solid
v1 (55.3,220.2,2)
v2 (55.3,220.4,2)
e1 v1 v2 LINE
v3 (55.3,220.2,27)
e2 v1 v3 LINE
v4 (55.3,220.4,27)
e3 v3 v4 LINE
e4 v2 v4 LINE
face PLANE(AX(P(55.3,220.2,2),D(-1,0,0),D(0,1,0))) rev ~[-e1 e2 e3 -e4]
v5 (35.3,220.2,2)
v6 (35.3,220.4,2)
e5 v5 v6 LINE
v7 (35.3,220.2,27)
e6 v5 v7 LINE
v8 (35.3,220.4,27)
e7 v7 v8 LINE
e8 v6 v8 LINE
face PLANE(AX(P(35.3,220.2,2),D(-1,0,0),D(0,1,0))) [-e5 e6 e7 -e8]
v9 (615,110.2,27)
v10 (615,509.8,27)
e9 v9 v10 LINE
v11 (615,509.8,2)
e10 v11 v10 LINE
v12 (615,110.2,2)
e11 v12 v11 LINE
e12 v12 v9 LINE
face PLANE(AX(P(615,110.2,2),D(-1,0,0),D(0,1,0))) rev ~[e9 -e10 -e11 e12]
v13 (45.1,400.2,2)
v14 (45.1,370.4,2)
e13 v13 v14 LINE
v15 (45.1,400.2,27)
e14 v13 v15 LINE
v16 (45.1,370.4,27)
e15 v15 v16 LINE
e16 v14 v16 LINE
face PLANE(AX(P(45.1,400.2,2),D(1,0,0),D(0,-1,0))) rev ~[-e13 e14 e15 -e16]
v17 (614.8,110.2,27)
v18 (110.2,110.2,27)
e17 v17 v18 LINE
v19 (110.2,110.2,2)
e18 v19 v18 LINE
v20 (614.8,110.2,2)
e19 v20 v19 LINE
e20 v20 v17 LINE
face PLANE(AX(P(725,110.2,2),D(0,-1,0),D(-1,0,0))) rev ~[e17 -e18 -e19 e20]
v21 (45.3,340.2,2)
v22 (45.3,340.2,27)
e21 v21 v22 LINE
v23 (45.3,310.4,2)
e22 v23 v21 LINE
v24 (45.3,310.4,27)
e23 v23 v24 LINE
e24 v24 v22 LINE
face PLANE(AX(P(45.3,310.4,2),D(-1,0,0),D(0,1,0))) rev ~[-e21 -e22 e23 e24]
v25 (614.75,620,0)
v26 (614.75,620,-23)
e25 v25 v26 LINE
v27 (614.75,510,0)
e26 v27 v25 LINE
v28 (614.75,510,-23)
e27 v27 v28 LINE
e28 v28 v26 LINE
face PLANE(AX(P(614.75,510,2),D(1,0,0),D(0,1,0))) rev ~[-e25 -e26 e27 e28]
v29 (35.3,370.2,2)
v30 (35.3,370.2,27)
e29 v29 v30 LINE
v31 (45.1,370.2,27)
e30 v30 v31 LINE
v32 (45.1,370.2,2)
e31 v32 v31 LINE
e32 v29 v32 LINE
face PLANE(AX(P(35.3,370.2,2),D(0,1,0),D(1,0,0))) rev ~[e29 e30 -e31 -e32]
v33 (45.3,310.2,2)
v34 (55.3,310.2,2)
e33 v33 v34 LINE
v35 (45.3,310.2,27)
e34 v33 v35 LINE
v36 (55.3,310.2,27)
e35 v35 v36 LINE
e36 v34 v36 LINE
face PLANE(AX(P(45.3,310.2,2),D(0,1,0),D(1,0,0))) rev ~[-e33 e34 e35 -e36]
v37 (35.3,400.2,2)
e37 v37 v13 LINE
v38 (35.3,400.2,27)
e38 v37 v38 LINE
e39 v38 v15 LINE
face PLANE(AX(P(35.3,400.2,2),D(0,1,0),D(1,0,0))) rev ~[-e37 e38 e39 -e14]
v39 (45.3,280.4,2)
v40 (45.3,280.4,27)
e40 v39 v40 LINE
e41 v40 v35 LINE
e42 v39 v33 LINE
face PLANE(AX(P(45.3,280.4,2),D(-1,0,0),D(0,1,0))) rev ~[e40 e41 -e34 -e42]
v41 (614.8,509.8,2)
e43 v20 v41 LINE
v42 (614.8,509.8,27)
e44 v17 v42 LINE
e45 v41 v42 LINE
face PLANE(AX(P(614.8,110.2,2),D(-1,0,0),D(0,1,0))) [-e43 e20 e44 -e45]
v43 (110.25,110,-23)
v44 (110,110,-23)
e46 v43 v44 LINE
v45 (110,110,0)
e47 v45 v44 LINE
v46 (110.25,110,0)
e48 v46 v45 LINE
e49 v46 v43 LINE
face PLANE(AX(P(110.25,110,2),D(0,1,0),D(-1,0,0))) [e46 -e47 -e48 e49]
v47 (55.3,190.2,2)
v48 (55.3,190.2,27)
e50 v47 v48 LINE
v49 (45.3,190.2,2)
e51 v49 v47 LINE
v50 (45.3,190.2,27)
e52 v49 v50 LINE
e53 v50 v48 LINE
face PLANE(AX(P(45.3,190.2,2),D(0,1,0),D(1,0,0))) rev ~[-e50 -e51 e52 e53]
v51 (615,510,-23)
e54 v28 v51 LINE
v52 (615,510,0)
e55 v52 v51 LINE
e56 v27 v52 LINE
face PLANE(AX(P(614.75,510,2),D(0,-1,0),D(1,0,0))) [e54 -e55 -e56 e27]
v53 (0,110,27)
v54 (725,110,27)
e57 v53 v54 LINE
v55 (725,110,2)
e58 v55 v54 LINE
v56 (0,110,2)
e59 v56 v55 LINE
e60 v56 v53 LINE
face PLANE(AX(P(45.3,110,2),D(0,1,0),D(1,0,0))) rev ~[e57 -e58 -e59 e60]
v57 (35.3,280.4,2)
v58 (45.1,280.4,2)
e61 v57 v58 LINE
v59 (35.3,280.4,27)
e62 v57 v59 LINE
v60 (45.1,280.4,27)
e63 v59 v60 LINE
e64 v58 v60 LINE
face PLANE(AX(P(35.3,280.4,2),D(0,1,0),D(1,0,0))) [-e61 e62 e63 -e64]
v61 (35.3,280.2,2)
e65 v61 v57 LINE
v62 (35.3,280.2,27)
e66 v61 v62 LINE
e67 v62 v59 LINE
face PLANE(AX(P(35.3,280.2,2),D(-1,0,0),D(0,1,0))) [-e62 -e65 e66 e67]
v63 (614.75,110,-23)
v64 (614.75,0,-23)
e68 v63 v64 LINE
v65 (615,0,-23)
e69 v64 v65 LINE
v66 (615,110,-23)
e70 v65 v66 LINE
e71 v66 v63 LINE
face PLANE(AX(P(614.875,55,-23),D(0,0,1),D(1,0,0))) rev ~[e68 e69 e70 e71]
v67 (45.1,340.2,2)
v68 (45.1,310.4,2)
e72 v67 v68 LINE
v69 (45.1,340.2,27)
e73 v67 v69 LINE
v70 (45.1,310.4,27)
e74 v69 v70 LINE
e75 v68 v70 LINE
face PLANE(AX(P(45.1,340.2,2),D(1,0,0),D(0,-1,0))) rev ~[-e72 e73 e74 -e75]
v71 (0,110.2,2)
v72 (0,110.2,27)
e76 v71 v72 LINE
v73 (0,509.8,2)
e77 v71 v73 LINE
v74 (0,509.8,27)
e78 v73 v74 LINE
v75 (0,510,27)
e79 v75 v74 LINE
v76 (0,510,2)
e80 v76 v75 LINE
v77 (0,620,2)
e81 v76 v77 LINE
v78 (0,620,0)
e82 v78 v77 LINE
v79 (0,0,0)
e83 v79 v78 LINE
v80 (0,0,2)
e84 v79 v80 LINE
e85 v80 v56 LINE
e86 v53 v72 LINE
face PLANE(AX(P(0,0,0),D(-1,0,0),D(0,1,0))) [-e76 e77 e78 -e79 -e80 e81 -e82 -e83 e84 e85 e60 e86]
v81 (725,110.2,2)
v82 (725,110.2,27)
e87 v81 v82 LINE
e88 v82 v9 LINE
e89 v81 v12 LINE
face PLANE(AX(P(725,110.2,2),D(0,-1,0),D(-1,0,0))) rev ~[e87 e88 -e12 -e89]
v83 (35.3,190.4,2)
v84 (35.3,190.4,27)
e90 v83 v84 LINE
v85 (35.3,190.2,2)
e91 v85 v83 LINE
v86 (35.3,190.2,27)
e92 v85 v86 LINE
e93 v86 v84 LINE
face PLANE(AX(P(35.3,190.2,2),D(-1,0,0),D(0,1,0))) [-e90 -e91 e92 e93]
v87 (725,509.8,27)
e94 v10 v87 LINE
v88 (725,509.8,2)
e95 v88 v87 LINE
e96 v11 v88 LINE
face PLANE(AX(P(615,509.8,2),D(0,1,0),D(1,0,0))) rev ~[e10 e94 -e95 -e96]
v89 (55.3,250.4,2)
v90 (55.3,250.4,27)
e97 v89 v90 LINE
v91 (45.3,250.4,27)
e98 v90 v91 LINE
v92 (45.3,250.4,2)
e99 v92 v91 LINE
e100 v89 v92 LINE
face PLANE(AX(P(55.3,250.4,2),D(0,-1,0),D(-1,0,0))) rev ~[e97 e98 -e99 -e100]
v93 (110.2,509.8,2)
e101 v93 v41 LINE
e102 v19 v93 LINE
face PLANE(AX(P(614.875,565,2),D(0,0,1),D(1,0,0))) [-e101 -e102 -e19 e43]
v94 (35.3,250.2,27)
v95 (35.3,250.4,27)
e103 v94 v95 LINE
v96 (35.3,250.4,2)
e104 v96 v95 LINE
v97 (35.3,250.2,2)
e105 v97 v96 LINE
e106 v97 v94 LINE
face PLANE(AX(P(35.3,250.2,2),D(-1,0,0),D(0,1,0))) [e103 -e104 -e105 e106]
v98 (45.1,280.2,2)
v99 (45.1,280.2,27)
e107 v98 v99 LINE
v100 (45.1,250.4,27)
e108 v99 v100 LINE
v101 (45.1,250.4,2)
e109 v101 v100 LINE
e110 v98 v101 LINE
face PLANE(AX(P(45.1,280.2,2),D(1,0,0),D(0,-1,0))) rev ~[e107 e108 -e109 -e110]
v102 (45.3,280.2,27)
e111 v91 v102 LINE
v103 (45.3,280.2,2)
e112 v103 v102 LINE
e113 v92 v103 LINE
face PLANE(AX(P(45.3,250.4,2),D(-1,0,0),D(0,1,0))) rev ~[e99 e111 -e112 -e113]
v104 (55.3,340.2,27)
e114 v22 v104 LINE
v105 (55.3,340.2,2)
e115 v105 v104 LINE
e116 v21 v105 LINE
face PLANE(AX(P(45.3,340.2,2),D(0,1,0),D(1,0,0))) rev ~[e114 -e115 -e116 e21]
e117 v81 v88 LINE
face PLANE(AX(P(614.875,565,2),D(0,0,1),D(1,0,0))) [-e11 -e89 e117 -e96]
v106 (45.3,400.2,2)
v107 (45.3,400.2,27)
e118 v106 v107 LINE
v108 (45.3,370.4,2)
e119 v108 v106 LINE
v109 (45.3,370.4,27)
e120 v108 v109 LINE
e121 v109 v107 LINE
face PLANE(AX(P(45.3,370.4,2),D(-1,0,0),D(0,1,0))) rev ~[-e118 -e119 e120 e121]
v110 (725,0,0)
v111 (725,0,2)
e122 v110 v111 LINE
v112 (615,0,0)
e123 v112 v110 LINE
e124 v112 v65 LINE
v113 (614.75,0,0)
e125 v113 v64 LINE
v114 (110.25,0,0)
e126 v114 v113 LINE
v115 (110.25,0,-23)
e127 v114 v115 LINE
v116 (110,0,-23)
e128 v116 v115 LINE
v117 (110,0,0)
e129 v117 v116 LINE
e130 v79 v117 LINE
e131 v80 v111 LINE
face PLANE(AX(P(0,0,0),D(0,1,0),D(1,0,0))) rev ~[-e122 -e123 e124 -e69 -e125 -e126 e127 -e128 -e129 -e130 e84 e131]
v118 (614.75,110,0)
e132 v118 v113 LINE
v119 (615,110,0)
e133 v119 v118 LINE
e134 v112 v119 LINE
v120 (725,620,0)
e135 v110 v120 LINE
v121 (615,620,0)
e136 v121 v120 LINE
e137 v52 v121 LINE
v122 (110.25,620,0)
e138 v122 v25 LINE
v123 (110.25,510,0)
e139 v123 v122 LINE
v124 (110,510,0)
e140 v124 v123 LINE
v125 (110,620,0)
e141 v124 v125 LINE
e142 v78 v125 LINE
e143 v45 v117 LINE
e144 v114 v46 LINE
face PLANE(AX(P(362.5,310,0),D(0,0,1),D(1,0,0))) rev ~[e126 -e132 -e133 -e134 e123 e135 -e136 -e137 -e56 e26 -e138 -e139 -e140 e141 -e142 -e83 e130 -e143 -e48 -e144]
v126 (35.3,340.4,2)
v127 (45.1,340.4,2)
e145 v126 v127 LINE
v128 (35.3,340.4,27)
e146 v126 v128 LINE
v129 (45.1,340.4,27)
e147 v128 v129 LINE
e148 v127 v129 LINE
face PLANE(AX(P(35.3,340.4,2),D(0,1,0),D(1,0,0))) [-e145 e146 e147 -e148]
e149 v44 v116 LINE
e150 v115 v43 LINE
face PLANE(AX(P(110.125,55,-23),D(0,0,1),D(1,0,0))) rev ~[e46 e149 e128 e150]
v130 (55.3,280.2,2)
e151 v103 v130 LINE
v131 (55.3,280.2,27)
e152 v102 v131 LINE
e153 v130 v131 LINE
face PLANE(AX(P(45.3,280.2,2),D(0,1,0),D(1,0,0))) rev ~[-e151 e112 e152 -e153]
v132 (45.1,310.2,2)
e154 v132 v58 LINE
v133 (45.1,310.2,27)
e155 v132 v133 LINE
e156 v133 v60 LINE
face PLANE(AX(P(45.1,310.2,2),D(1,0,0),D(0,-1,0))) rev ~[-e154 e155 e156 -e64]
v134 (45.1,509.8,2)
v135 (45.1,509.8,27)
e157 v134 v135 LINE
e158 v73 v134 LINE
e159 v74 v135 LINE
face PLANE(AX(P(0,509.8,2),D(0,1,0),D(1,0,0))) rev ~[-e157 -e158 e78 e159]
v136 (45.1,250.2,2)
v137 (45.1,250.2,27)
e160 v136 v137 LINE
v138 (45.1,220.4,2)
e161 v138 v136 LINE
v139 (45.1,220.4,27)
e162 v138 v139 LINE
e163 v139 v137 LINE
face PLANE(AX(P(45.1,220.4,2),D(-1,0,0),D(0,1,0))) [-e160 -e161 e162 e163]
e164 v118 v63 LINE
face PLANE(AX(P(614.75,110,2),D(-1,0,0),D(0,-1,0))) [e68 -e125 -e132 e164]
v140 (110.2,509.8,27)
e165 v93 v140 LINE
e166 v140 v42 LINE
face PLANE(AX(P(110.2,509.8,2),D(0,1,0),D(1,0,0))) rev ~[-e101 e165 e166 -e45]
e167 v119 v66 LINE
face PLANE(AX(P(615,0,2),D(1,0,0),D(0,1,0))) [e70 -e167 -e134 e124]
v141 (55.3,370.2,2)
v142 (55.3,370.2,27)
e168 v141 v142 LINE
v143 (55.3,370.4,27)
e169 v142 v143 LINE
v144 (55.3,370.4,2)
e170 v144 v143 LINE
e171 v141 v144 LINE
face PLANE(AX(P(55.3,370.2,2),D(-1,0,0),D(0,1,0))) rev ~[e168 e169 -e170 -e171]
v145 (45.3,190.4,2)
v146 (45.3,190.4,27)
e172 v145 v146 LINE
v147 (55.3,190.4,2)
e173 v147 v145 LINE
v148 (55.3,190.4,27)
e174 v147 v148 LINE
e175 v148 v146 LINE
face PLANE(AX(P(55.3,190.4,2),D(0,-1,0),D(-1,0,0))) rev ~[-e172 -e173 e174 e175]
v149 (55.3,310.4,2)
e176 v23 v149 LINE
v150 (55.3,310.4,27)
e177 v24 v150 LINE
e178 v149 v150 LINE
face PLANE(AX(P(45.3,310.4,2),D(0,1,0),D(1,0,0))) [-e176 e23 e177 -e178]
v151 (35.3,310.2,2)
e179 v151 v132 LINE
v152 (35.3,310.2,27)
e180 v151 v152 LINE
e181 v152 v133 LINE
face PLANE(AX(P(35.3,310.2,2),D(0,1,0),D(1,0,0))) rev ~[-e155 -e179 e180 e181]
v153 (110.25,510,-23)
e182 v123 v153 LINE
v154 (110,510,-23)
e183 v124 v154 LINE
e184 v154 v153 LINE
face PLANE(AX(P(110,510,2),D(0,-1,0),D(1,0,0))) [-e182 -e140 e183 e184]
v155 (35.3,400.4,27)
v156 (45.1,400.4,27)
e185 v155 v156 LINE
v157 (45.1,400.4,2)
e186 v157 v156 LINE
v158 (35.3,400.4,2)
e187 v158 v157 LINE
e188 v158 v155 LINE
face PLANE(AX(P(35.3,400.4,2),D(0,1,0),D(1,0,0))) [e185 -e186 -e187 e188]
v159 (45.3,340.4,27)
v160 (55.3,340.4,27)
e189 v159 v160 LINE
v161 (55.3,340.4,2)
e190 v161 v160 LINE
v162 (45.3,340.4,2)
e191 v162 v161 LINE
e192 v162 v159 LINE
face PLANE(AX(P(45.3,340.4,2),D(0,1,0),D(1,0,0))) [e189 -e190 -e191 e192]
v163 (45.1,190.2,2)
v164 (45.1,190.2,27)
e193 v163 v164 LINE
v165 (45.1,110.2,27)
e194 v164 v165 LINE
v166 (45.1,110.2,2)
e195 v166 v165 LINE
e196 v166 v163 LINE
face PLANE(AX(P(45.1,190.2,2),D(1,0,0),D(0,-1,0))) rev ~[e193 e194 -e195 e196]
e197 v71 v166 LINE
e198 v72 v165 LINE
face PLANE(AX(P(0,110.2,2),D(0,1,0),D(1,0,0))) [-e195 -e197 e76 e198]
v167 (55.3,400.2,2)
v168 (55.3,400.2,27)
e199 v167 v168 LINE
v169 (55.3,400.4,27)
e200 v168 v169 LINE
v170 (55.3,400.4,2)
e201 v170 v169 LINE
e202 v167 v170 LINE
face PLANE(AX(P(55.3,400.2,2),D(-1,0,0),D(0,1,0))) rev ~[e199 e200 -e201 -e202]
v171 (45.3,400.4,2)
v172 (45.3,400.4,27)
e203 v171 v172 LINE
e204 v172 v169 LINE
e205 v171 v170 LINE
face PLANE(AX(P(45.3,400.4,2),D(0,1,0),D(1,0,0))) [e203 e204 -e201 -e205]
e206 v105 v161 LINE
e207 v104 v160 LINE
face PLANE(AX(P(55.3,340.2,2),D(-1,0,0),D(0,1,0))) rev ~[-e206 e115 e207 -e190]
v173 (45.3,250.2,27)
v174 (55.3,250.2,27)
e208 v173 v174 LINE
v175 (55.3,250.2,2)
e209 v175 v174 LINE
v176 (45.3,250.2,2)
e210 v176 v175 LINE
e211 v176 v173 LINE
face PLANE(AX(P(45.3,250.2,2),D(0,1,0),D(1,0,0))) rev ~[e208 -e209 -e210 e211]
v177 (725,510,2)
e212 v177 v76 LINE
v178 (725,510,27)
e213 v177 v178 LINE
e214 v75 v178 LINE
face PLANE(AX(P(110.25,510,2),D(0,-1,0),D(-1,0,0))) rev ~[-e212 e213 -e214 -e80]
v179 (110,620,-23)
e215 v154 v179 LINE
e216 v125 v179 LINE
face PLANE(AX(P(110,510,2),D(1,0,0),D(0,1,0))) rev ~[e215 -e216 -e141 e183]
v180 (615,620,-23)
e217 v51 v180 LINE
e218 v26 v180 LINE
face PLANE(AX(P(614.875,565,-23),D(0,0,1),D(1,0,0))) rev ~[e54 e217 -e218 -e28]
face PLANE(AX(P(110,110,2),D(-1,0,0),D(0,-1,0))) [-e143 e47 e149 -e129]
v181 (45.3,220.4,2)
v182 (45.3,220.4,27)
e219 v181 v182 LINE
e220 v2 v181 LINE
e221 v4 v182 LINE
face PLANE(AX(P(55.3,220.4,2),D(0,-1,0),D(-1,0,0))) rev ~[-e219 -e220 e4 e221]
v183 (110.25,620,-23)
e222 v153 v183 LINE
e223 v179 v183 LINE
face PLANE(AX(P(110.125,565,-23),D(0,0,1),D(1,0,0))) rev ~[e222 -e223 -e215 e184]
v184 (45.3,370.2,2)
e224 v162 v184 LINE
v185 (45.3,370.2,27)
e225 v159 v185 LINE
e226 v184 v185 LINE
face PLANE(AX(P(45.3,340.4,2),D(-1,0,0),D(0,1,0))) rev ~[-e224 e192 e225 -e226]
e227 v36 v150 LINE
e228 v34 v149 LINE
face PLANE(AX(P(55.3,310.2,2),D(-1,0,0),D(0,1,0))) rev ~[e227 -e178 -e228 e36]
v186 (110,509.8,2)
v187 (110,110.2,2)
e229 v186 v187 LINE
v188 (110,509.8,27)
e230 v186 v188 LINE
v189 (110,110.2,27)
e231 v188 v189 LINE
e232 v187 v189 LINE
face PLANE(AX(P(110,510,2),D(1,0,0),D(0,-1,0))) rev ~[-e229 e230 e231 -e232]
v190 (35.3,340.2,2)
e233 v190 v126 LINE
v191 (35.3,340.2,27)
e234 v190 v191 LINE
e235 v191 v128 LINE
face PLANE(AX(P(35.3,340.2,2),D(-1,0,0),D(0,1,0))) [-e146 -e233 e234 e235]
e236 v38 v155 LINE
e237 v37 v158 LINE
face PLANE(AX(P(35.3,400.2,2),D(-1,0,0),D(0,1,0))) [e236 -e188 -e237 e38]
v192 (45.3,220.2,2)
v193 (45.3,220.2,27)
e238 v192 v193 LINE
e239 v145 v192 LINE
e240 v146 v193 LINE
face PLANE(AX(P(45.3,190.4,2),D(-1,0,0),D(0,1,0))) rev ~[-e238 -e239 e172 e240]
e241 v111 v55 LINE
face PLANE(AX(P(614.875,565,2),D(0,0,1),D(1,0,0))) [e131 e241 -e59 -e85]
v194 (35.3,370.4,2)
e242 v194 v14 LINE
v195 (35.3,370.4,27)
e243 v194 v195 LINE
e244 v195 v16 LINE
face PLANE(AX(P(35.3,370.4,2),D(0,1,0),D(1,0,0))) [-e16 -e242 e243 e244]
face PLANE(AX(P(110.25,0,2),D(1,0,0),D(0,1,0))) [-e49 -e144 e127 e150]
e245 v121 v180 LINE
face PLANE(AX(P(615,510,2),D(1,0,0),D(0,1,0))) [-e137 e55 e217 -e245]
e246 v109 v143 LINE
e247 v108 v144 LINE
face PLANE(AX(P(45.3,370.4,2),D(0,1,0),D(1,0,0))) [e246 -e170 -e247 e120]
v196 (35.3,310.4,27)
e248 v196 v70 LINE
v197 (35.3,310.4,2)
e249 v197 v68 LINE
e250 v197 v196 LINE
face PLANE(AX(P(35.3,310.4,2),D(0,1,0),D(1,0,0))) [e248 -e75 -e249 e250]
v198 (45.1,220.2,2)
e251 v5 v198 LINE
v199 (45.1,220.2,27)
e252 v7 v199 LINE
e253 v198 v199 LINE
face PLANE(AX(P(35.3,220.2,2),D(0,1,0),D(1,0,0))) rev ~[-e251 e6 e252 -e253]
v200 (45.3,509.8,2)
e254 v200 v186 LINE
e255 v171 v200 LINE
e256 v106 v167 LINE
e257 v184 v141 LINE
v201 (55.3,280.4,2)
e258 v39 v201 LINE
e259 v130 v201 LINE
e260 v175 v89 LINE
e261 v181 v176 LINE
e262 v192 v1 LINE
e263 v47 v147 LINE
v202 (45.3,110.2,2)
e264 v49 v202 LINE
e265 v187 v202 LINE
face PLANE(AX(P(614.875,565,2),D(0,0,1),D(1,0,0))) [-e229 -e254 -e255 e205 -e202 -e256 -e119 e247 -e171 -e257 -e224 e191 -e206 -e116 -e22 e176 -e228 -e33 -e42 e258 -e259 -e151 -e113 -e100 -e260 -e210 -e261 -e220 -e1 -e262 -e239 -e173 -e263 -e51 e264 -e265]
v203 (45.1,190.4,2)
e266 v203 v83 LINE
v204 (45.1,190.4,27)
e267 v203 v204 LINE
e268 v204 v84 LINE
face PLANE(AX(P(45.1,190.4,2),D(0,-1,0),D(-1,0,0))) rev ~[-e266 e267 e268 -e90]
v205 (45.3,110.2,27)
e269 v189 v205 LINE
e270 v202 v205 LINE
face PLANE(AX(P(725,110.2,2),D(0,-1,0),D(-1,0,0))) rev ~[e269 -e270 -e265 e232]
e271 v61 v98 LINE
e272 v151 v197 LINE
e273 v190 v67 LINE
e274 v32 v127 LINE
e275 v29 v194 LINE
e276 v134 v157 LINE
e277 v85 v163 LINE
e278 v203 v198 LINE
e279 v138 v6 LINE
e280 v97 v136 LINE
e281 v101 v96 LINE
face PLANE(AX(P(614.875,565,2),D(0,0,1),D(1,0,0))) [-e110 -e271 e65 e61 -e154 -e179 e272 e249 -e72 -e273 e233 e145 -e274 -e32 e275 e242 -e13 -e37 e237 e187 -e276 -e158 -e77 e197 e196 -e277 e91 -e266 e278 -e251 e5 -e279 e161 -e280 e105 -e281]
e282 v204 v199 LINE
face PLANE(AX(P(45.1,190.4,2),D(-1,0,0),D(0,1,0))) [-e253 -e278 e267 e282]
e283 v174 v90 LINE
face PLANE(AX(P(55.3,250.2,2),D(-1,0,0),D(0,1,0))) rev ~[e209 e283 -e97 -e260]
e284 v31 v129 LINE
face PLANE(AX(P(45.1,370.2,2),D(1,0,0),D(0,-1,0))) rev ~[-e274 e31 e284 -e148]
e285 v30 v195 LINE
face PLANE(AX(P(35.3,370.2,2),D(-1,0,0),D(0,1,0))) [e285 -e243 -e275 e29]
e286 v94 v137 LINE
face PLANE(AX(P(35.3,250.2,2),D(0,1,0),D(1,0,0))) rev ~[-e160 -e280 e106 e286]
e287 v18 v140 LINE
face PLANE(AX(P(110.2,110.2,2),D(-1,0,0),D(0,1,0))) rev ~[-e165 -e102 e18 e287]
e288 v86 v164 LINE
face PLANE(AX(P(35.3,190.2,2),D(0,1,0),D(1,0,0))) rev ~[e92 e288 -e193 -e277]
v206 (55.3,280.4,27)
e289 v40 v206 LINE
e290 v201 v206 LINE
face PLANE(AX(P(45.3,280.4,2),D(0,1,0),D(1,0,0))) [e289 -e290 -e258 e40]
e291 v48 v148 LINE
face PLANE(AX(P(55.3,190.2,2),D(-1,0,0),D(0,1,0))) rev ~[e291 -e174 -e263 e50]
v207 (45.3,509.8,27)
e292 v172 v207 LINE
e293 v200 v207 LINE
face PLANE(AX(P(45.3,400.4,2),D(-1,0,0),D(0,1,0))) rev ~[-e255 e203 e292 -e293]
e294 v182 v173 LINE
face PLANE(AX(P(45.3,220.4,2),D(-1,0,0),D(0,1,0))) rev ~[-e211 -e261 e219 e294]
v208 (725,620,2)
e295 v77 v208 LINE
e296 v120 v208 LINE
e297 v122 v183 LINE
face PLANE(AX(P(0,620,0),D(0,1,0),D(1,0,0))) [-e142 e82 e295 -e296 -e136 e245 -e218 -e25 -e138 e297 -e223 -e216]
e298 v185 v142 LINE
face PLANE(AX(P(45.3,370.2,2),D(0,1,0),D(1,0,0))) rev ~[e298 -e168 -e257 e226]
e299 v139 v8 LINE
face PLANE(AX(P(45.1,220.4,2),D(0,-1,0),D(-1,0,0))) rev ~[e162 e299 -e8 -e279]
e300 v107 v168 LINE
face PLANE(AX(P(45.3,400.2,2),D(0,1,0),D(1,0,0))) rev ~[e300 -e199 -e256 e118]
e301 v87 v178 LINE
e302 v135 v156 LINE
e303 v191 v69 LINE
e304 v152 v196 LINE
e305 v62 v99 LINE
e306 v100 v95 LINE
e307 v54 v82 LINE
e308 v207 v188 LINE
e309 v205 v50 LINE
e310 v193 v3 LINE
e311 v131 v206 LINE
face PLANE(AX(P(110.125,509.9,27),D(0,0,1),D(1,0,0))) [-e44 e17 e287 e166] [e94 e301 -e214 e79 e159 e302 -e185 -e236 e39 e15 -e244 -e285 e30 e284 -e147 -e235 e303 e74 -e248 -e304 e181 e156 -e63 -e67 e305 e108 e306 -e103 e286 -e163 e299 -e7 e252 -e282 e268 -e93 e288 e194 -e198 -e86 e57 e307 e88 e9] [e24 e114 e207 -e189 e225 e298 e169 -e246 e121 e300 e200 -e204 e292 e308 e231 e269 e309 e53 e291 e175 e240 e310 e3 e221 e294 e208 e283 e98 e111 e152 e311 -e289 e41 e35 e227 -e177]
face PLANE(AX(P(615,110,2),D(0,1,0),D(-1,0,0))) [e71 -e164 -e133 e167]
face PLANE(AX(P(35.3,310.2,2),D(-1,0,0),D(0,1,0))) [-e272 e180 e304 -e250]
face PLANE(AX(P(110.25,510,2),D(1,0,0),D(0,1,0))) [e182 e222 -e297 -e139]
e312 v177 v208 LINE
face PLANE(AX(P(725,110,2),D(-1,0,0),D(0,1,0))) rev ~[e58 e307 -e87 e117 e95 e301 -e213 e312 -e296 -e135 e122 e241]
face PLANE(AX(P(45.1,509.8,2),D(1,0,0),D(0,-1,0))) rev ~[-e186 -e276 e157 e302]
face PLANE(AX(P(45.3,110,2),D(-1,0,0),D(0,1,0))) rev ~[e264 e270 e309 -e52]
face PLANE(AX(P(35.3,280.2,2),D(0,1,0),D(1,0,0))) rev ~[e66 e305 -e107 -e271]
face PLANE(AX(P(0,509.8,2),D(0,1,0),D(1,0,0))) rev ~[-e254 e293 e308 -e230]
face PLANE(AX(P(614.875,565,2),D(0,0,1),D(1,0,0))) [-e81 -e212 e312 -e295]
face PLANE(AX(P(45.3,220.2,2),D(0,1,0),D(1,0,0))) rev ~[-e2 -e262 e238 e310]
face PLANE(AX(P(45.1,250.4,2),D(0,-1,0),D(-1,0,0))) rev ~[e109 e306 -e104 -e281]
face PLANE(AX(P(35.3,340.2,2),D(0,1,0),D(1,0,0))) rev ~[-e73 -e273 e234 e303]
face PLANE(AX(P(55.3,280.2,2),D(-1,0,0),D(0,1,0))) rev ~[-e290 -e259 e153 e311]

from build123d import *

# Parameters (mm, degrees)
F0_W     = 725
F0_H     = 620
F1_DEPTH = 2
F2_W     = 0.25
F2_H     = 110
F3_DEPTH = 25
F4_DEPTH = 25
F2_W_2   = 110
F2_H_2   = 0.2
F2_W_3   = 0.2
F2_H_3   = 399.6
F5_DEPTH = 25
F2_W_4   = 64.7
F6_DEPTH = 25
F2_W_5   = 45.1
F7_DEPTH = 25
F2_H_4   = 49.5626640439
F8_DEPTH = 25
F2_H_5   = 109.4
F2_W_6   = 9.8
F2_H_6   = 30.4373359561
F2_W_7   = 10
F2_H_7   = 29.8
F9_DEPTH = 25


# Not quite as in the source:
# - a feature names something its author has since deleted; it is built from what else it names


with BuildPart() as f1:
    # F0 (on Top) → F1 (new body)
    with BuildSketch(Plane.XY):
        with Locations((362.5, 310)):
            Rectangle(F0_W, F0_H)
    extrude(amount=F1_DEPTH)

    # F2 (on face) → F3 (join)
    with BuildSketch(Plane.XY.offset(2)):
        with Locations((614.875, 565)):
            Rectangle(F2_W, F2_H)
        with Locations((110.125, 565)):
            Rectangle(F2_W, F2_H)
        Polygon((110.2, 110), (110, 110), (110, 0), (110.25, 0), (110.25, 110), align=None)
        Polygon((615, 110), (614.8, 110), (614.75, 110), (614.75, 0), (615, 0), align=None)
    extrude(amount=-F3_DEPTH)

    # F2 (on face) → F4 (join)
    with BuildSketch(Plane.XY.offset(2)):
        Polygon((110, 510), (0, 510), (0, 509.8), (45.1, 509.8), (45.3, 509.8), (110, 509.8), align=None)
        Polygon((614.75, 510), (110.25, 510), (110.25, 509.8), (614.8, 509.8), (615, 509.8), (615, 510), align=None)
    extrude(amount=F4_DEPTH)

    # F2 (on face) → F5 (join)
    with BuildSketch(Plane.XY.offset(2)):
        with Locations((670, 509.9)):
            Rectangle(F2_W_2, F2_H_2)
        with Locations((614.9, 310)):
            Rectangle(F2_W_3, F2_H_3)
    extrude(amount=F5_DEPTH)

    # F2 (on face) → F6 (join)
    with BuildSketch(Plane.XY.offset(2)):
        with Locations((670, 110.1)):
            Rectangle(F2_W_2, F2_H_2)
        Polygon((614.8, 110.2), (110.2, 110.2), (110.2, 110), (110.25, 110), (614.75, 110), (614.8, 110), align=None)
        with Locations((614.9, 110.1)):
            Rectangle(F2_W_3, F2_H_2)
        with Locations((77.65, 110.1)):
            Rectangle(F2_W_4, F2_H_2)
        with Locations((110.1, 110.1)):
            Rectangle(F2_W_3, F2_H_2)
    extrude(amount=F6_DEPTH)

    # F2 (on face) → F7 (join)
    with BuildSketch(Plane.XY.offset(2)):
        with Locations((22.55, 110.1)):
            Rectangle(F2_W_5, F2_H_2)
    extrude(amount=F7_DEPTH)

    # F2 (on face) → F8 (join)
    with BuildSketch(Plane.XY.offset(2)):
        with Locations((45.2, 165.418667978)):
            Rectangle(F2_W_3, F2_H_4)
    extrude(amount=F8_DEPTH)

    # F2 (on face) → F9 (join)
    with BuildSketch(Plane.XY.offset(2)):
        Polygon((110.25, 510), (110, 510), (110, 509.8), (110.2, 509.8), (110.25, 509.8), align=None)
        with Locations((110.1, 310)):
            Rectangle(F2_W_3, F2_H_3)
        with Locations((45.2, 455.1)):
            Rectangle(F2_W_3, F2_H_5)
        with Locations((45.2, 400.3)):
            Rectangle(F2_W_3, F2_H_2)
        with Locations((40.2, 400.3)):
            Rectangle(F2_W_6, F2_H_2)
        with Locations((45.2, 125.418667978)):
            Rectangle(F2_W_3, F2_H_6)
        with Locations((45.2, 110.1)):
            Rectangle(F2_W_3, F2_H_2)
        with Locations((50.3, 400.3)):
            Rectangle(F2_W_7, F2_H_2)
        with Locations((45.2, 385.3)):
            Rectangle(F2_W_3, F2_H_7)
        with Locations((45.2, 165.418667978)):
            Rectangle(F2_W_3, F2_H_4)
        with Locations((45.2, 370.3)):
            Rectangle(F2_W_3, F2_H_2)
        with Locations((40.2, 370.3)):
            Rectangle(F2_W_6, F2_H_2)
        with Locations((40.2, 190.3)):
            Rectangle(F2_W_6, F2_H_2)
        with Locations((45.2, 190.3)):
            Rectangle(F2_W_3, F2_H_2)
        with Locations((50.3, 370.3)):
            Rectangle(F2_W_7, F2_H_2)
        with Locations((50.3, 190.3)):
            Rectangle(F2_W_7, F2_H_2)
        with Locations((45.2, 355.3)):
            Rectangle(F2_W_3, F2_H_7)
        with Locations((45.2, 205.3)):
            Rectangle(F2_W_3, F2_H_7)
        with Locations((45.2, 340.3)):
            Rectangle(F2_W_3, F2_H_2)
        with Locations((40.2, 340.3)):
            Rectangle(F2_W_6, F2_H_2)
        with Locations((40.2, 220.3)):
            Rectangle(F2_W_6, F2_H_2)
        with Locations((45.2, 220.3)):
            Rectangle(F2_W_3, F2_H_2)
        with Locations((50.3, 340.3)):
            Rectangle(F2_W_7, F2_H_2)
        with Locations((50.3, 220.3)):
            Rectangle(F2_W_7, F2_H_2)
        with Locations((45.2, 325.3)):
            Rectangle(F2_W_3, F2_H_7)
        with Locations((45.2, 235.3)):
            Rectangle(F2_W_3, F2_H_7)
        with Locations((45.2, 310.3)):
            Rectangle(F2_W_3, F2_H_2)
        with Locations((40.2, 310.3)):
            Rectangle(F2_W_6, F2_H_2)
        with Locations((40.2, 250.3)):
            Rectangle(F2_W_6, F2_H_2)
        with Locations((45.2, 250.3)):
            Rectangle(F2_W_3, F2_H_2)
        with Locations((50.3, 310.3)):
            Rectangle(F2_W_7, F2_H_2)
        with Locations((50.3, 250.3)):
            Rectangle(F2_W_7, F2_H_2)
        with Locations((45.2, 295.3)):
            Rectangle(F2_W_3, F2_H_7)
        with Locations((45.2, 265.3)):
            Rectangle(F2_W_3, F2_H_7)
        with Locations((45.2, 280.3)):
            Rectangle(F2_W_3, F2_H_2)
        with Locations((40.2, 280.3)):
            Rectangle(F2_W_6, F2_H_2)
        with Locations((50.3, 280.3)):
            Rectangle(F2_W_7, F2_H_2)
    extrude(amount=F9_DEPTH)


solid = f1.part
